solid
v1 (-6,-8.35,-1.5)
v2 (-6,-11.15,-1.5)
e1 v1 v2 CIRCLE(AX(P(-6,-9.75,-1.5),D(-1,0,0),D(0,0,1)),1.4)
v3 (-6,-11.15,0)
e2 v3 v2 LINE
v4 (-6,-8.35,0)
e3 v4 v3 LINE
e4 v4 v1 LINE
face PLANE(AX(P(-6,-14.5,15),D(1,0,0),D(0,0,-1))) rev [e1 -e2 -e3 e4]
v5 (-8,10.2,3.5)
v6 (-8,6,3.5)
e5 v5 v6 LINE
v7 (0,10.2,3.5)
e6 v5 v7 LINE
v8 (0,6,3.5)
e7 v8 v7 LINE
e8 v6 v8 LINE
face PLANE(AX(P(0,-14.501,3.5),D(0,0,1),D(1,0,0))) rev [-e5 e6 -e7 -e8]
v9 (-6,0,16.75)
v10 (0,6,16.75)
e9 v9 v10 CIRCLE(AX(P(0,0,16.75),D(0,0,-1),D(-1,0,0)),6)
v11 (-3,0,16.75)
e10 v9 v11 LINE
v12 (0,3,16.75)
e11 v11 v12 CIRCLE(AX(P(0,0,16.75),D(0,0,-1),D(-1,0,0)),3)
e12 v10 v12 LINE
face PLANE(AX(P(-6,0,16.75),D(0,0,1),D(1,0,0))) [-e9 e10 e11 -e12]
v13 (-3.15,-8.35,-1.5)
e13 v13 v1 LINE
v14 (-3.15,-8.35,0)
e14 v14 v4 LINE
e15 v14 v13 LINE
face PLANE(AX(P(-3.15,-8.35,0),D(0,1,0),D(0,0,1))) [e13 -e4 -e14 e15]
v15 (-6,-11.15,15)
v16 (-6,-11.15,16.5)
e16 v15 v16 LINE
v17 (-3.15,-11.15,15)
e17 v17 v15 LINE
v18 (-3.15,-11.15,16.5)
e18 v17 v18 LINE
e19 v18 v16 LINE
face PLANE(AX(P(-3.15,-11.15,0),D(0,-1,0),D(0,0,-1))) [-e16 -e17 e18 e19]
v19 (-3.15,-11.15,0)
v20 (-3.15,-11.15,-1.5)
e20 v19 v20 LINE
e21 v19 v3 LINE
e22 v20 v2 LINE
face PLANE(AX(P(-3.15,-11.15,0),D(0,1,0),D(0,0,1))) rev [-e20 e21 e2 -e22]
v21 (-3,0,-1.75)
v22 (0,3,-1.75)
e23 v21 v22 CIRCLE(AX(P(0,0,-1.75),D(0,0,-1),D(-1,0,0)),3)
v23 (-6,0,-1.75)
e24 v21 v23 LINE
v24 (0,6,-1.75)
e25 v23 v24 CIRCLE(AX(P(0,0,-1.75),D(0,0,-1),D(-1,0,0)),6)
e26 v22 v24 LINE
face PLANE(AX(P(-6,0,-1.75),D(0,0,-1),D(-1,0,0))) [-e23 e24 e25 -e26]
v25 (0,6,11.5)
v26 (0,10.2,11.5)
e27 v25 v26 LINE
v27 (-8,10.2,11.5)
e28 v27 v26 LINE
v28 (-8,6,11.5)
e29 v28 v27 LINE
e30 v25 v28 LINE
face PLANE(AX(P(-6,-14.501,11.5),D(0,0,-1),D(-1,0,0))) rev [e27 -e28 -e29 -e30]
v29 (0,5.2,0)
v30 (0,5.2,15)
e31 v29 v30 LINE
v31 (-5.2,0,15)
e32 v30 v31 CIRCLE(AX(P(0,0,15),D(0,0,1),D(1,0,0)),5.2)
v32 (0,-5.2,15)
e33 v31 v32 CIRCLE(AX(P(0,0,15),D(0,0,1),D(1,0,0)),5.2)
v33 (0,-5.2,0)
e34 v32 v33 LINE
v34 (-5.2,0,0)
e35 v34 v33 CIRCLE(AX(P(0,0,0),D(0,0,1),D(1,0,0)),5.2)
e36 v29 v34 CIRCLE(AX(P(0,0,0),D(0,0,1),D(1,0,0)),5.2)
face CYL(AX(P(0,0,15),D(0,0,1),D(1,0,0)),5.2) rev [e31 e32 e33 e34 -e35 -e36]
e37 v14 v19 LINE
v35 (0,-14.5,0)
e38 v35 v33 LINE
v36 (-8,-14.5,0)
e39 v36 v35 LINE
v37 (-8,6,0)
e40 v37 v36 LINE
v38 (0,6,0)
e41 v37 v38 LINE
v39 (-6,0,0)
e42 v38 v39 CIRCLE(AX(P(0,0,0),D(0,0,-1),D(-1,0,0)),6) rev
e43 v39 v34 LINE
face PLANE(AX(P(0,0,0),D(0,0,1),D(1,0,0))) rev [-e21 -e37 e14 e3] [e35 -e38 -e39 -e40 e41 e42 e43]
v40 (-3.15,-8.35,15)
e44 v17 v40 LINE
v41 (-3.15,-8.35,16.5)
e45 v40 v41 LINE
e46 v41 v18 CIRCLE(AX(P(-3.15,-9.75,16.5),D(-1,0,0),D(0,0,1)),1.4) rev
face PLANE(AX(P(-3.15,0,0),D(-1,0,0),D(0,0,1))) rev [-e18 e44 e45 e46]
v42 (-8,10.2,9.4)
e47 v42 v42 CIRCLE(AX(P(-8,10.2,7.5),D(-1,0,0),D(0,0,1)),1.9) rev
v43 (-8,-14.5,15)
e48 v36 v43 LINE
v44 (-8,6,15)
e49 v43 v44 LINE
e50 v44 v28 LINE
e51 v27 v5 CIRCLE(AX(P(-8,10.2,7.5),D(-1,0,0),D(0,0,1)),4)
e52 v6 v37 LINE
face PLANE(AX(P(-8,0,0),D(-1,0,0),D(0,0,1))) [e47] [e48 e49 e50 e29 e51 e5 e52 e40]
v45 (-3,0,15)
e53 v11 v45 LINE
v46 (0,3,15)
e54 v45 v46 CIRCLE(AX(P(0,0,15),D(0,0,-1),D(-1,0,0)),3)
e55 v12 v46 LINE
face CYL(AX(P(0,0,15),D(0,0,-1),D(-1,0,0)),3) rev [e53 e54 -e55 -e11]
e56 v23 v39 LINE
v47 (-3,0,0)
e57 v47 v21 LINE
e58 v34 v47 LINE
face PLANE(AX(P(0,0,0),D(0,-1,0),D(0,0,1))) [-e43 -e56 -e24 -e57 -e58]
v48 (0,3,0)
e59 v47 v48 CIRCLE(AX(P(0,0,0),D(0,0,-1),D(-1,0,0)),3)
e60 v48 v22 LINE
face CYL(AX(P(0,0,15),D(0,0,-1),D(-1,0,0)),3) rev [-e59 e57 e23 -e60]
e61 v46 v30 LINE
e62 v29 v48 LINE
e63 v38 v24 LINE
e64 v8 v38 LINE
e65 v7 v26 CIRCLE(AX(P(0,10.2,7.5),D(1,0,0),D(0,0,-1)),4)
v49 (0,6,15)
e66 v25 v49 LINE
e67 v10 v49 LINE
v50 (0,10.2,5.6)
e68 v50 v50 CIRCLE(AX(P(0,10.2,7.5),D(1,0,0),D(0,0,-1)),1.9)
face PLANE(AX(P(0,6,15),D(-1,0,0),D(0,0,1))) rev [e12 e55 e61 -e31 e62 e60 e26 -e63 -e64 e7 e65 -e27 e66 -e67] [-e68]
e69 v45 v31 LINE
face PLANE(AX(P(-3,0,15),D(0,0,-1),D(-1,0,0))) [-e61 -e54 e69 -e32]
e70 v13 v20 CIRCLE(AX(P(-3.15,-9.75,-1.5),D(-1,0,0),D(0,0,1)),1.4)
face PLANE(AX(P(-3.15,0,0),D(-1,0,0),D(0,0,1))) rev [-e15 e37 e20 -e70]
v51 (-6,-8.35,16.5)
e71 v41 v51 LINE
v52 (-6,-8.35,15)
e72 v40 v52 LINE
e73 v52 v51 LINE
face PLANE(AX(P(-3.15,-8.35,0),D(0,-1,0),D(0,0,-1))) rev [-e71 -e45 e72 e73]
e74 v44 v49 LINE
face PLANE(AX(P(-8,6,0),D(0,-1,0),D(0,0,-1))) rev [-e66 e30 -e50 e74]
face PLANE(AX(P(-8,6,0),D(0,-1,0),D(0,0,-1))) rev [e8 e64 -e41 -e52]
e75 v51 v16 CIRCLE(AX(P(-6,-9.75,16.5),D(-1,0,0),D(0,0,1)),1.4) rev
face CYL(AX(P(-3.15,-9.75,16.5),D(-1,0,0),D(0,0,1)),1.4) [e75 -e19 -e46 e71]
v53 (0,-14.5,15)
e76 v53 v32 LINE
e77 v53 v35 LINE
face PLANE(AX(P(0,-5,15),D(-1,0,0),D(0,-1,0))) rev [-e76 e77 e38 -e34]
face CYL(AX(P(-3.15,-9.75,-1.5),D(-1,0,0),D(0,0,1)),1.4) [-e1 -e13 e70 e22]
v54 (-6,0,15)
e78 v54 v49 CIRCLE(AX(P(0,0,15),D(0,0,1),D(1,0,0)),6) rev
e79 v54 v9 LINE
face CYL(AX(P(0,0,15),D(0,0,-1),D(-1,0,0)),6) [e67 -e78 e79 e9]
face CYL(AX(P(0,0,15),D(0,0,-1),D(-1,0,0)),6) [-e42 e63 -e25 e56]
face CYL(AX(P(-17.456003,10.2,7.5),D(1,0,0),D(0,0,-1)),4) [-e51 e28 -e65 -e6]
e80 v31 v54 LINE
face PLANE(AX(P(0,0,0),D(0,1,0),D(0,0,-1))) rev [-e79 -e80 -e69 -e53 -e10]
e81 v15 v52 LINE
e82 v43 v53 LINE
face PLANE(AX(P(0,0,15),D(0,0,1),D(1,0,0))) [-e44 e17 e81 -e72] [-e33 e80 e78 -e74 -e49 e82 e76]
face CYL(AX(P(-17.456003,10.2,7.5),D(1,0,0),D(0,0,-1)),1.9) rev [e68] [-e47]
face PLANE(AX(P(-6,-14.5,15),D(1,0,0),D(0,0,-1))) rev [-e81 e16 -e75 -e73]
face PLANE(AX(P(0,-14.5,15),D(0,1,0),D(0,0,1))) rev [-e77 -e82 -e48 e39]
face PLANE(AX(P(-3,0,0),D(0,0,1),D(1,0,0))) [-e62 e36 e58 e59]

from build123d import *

# Parameters (mm, degrees)
BOSS_EXTRUDE1_DEPTH       = 15
BOSS_EXTRUDE2_DEPTH       = 2.85
SKETCH4_W                 = 1.05
SKETCH4_H                 = 0.3
REVOLVE1_ANGLE            = 180
SKETCH5_R                 = 1.9
BOSS_EXTRUDE3_DEPTH       = 6
BOSS_EXTRUDE4_REACH       = 29.869
BOSS_EXTRUDE4_END_RADIUS  = 6
SKETCH6_W                 = 6
SKETCH6_H                 = 8
SKETCH8_W                 = 1.75
SKETCH8_H                 = 3
REVOLVE2_ANGLE            = 90
BOSS_EXTRUDE5_DEPTH       = 15
BOSS_EXTRUDE5_START       = -8
BOSS_EXTRUDE5_2_OUTLINE_R = 1.9
BOSS_EXTRUDE5_2_DEPTH     = 2


with BuildPart() as part:
    # Sketch1 → Boss-Extrude1 (new body)
    with BuildSketch(Plane.XY):
        with BuildLine():
            Line((0, -5), (0, -14.5))
            Line((0, -14.5), (-6, -14.5))
            Line((-6, -14.5), (-6, 0))
            ThreePointArc((-6, 0), (-4.242640687, 4.242640687), (0, 6))
            Line((0, 6), (0, 5))
            ThreePointArc((0, 5), (-5, 0), (0, -5))
        make_face()
    extrude(amount=BOSS_EXTRUDE1_DEPTH)

    # Sketch3 → Boss-Extrude2 (add)
    with BuildSketch(Plane(origin=(-6, 0, 0), x_dir=(0, 0, -1), z_dir=(1, 0, 0))):
        with BuildLine():
            Line((1.5, -8.35), (0, -8.35))
            Line((0, -8.35), (0, -11.15))
            Line((0, -11.15), (1.5, -11.15))
            ThreePointArc((1.5, -11.15), (2.9, -9.75), (1.5, -8.35))
        make_face()
        with BuildLine():
            Line((-16.5, -11.15), (-15, -11.15))
            Line((-15, -11.15), (-15, -8.35))
            Line((-15, -8.35), (-16.5, -8.35))
            ThreePointArc((-16.5, -8.35), (-17.9, -9.75), (-16.5, -11.15))
        make_face()
    extrude(amount=BOSS_EXTRUDE2_DEPTH)

    # Sketch4 → Revolve1 (revolve)
    with BuildSketch(Plane(origin=(0, 0, 0), x_dir=(0, 0, -1), z_dir=(1, 0, 0))):
        with Locations((-11.575, 4.85)):
            Rectangle(SKETCH4_W, SKETCH4_H)
        with Locations((-3.425, 4.85)):
            Rectangle(SKETCH4_W, SKETCH4_H)
    revolve(axis=Axis((0, 0, 15), (0, 0, 1)), revolution_arc=REVOLVE1_ANGLE)



with BuildPart() as body_2:
    # Sketch5 → Boss-Extrude3 (new body)
    with BuildSketch(Plane(origin=(0, 0, 0), x_dir=(0, 0, -1), z_dir=(1, 0, 0))):
        with BuildLine():
            Line((-11.5, 6), (-11.5, 10.2))
            ThreePointArc((-11.5, 10.2), (-7.5, 14.2), (-3.5, 10.2))
            Line((-3.5, 10.2), (-3.5, 6))
            Line((-3.5, 6), (-11.5, 6))
        make_face()
        with Locations((-7.5, 10.2)):
            Circle(SKETCH5_R, mode=Mode.SUBTRACT)
    extrude(amount=-BOSS_EXTRUDE3_DEPTH)


with BuildPart() as part_1:
    add(part.part)

    add(body_2.part)  # Boss-Extrude4 merges body 2
    # Boss-Extrude4: up to this cylinder (the profile starts outside it)
    boss_extrude4_end = Plane(origin=(0, 0, 7.5), z_dir=(0, 0, -1)) * Cylinder(BOSS_EXTRUDE4_END_RADIUS, 72.738, mode=Mode.PRIVATE)
    # Sketch6 → Boss-Extrude4 (add, up to the surface)
    with BuildSketch(Plane.XZ.offset(-6), mode=Mode.PRIVATE) as boss_extrude4_sk1:
        with Locations((-3, 7.5)):
            Rectangle(SKETCH6_W, SKETCH6_H)
    boss_extrude4_tool1 = extrude(boss_extrude4_sk1.sketch, amount=BOSS_EXTRUDE4_REACH, mode=Mode.PRIVATE) - boss_extrude4_end
    add(boss_extrude4_tool1.solids().sort_by_distance((-3, 6, 7.5))[0])

    # Sketch7 → Cut-Revolve1 (revolve, cut)
    with BuildSketch(Plane(origin=(0, 0, 0), x_dir=(0, 0, -1), z_dir=(1, 0, 0))):
        Polygon((-15, 5.2), (-15, 5), (-12.1, 5), (-12.1, 4.7), (-11.05, 4.7), (-11.05, 5), (-3.95, 5), (-3.95, 4.7), (-2.9, 4.7), (-2.9, 5), (0, 5), (0, 5.2), align=None)
    revolve(axis=Axis((0, 0, 15), (0, 0, -1)), mode=Mode.SUBTRACT)

    # Sketch8 → Revolve2 (revolve)
    with BuildSketch(Plane(origin=(0, 0, 0), x_dir=(0, 0, -1), z_dir=(1, 0, 0))):
        with Locations((-15.875, 4.5)):
            Rectangle(SKETCH8_W, SKETCH8_H)
        with Locations((0.875, 4.5)):
            Rectangle(SKETCH8_W, SKETCH8_H)
    revolve(axis=Axis((0, 0, 15), (0, 0, 1)), revolution_arc=REVOLVE2_ANGLE)

    # Boss-Extrude5: read off the stored shape, not the designer's step
    # Boss-Extrude5 outline → Boss-Extrude5 (add)
    with BuildSketch(Plane.XY):
        with BuildLine():
            Line((-8, -14.5), (-6, -14.5))
            Line((-6, -14.5), (-6, 0))
            ThreePointArc((-6, 0), (-4.242640687, 4.242640687), (0, 6))
            Line((0, 6), (-8, 6))
            Line((-8, 6), (-8, -14.5))
        make_face()
    extrude(amount=BOSS_EXTRUDE5_DEPTH)

    # Boss-Extrude5 2 outline → Boss-Extrude5 2 (add)
    with BuildSketch(Plane.YZ.offset(BOSS_EXTRUDE5_START)):
        with BuildLine():
            Line((10.2, 11.5), (6, 11.5))
            Line((6, 11.5), (6, 3.5))
            Line((6, 3.5), (10.2, 3.5))
            ThreePointArc((10.2, 3.5), (14.2, 7.5), (10.2, 11.5))
        make_face()
        with Locations((10.2, 7.5)):
            Circle(BOSS_EXTRUDE5_2_OUTLINE_R, mode=Mode.SUBTRACT)
    extrude(amount=BOSS_EXTRUDE5_2_DEPTH)


solid = part_1.part
